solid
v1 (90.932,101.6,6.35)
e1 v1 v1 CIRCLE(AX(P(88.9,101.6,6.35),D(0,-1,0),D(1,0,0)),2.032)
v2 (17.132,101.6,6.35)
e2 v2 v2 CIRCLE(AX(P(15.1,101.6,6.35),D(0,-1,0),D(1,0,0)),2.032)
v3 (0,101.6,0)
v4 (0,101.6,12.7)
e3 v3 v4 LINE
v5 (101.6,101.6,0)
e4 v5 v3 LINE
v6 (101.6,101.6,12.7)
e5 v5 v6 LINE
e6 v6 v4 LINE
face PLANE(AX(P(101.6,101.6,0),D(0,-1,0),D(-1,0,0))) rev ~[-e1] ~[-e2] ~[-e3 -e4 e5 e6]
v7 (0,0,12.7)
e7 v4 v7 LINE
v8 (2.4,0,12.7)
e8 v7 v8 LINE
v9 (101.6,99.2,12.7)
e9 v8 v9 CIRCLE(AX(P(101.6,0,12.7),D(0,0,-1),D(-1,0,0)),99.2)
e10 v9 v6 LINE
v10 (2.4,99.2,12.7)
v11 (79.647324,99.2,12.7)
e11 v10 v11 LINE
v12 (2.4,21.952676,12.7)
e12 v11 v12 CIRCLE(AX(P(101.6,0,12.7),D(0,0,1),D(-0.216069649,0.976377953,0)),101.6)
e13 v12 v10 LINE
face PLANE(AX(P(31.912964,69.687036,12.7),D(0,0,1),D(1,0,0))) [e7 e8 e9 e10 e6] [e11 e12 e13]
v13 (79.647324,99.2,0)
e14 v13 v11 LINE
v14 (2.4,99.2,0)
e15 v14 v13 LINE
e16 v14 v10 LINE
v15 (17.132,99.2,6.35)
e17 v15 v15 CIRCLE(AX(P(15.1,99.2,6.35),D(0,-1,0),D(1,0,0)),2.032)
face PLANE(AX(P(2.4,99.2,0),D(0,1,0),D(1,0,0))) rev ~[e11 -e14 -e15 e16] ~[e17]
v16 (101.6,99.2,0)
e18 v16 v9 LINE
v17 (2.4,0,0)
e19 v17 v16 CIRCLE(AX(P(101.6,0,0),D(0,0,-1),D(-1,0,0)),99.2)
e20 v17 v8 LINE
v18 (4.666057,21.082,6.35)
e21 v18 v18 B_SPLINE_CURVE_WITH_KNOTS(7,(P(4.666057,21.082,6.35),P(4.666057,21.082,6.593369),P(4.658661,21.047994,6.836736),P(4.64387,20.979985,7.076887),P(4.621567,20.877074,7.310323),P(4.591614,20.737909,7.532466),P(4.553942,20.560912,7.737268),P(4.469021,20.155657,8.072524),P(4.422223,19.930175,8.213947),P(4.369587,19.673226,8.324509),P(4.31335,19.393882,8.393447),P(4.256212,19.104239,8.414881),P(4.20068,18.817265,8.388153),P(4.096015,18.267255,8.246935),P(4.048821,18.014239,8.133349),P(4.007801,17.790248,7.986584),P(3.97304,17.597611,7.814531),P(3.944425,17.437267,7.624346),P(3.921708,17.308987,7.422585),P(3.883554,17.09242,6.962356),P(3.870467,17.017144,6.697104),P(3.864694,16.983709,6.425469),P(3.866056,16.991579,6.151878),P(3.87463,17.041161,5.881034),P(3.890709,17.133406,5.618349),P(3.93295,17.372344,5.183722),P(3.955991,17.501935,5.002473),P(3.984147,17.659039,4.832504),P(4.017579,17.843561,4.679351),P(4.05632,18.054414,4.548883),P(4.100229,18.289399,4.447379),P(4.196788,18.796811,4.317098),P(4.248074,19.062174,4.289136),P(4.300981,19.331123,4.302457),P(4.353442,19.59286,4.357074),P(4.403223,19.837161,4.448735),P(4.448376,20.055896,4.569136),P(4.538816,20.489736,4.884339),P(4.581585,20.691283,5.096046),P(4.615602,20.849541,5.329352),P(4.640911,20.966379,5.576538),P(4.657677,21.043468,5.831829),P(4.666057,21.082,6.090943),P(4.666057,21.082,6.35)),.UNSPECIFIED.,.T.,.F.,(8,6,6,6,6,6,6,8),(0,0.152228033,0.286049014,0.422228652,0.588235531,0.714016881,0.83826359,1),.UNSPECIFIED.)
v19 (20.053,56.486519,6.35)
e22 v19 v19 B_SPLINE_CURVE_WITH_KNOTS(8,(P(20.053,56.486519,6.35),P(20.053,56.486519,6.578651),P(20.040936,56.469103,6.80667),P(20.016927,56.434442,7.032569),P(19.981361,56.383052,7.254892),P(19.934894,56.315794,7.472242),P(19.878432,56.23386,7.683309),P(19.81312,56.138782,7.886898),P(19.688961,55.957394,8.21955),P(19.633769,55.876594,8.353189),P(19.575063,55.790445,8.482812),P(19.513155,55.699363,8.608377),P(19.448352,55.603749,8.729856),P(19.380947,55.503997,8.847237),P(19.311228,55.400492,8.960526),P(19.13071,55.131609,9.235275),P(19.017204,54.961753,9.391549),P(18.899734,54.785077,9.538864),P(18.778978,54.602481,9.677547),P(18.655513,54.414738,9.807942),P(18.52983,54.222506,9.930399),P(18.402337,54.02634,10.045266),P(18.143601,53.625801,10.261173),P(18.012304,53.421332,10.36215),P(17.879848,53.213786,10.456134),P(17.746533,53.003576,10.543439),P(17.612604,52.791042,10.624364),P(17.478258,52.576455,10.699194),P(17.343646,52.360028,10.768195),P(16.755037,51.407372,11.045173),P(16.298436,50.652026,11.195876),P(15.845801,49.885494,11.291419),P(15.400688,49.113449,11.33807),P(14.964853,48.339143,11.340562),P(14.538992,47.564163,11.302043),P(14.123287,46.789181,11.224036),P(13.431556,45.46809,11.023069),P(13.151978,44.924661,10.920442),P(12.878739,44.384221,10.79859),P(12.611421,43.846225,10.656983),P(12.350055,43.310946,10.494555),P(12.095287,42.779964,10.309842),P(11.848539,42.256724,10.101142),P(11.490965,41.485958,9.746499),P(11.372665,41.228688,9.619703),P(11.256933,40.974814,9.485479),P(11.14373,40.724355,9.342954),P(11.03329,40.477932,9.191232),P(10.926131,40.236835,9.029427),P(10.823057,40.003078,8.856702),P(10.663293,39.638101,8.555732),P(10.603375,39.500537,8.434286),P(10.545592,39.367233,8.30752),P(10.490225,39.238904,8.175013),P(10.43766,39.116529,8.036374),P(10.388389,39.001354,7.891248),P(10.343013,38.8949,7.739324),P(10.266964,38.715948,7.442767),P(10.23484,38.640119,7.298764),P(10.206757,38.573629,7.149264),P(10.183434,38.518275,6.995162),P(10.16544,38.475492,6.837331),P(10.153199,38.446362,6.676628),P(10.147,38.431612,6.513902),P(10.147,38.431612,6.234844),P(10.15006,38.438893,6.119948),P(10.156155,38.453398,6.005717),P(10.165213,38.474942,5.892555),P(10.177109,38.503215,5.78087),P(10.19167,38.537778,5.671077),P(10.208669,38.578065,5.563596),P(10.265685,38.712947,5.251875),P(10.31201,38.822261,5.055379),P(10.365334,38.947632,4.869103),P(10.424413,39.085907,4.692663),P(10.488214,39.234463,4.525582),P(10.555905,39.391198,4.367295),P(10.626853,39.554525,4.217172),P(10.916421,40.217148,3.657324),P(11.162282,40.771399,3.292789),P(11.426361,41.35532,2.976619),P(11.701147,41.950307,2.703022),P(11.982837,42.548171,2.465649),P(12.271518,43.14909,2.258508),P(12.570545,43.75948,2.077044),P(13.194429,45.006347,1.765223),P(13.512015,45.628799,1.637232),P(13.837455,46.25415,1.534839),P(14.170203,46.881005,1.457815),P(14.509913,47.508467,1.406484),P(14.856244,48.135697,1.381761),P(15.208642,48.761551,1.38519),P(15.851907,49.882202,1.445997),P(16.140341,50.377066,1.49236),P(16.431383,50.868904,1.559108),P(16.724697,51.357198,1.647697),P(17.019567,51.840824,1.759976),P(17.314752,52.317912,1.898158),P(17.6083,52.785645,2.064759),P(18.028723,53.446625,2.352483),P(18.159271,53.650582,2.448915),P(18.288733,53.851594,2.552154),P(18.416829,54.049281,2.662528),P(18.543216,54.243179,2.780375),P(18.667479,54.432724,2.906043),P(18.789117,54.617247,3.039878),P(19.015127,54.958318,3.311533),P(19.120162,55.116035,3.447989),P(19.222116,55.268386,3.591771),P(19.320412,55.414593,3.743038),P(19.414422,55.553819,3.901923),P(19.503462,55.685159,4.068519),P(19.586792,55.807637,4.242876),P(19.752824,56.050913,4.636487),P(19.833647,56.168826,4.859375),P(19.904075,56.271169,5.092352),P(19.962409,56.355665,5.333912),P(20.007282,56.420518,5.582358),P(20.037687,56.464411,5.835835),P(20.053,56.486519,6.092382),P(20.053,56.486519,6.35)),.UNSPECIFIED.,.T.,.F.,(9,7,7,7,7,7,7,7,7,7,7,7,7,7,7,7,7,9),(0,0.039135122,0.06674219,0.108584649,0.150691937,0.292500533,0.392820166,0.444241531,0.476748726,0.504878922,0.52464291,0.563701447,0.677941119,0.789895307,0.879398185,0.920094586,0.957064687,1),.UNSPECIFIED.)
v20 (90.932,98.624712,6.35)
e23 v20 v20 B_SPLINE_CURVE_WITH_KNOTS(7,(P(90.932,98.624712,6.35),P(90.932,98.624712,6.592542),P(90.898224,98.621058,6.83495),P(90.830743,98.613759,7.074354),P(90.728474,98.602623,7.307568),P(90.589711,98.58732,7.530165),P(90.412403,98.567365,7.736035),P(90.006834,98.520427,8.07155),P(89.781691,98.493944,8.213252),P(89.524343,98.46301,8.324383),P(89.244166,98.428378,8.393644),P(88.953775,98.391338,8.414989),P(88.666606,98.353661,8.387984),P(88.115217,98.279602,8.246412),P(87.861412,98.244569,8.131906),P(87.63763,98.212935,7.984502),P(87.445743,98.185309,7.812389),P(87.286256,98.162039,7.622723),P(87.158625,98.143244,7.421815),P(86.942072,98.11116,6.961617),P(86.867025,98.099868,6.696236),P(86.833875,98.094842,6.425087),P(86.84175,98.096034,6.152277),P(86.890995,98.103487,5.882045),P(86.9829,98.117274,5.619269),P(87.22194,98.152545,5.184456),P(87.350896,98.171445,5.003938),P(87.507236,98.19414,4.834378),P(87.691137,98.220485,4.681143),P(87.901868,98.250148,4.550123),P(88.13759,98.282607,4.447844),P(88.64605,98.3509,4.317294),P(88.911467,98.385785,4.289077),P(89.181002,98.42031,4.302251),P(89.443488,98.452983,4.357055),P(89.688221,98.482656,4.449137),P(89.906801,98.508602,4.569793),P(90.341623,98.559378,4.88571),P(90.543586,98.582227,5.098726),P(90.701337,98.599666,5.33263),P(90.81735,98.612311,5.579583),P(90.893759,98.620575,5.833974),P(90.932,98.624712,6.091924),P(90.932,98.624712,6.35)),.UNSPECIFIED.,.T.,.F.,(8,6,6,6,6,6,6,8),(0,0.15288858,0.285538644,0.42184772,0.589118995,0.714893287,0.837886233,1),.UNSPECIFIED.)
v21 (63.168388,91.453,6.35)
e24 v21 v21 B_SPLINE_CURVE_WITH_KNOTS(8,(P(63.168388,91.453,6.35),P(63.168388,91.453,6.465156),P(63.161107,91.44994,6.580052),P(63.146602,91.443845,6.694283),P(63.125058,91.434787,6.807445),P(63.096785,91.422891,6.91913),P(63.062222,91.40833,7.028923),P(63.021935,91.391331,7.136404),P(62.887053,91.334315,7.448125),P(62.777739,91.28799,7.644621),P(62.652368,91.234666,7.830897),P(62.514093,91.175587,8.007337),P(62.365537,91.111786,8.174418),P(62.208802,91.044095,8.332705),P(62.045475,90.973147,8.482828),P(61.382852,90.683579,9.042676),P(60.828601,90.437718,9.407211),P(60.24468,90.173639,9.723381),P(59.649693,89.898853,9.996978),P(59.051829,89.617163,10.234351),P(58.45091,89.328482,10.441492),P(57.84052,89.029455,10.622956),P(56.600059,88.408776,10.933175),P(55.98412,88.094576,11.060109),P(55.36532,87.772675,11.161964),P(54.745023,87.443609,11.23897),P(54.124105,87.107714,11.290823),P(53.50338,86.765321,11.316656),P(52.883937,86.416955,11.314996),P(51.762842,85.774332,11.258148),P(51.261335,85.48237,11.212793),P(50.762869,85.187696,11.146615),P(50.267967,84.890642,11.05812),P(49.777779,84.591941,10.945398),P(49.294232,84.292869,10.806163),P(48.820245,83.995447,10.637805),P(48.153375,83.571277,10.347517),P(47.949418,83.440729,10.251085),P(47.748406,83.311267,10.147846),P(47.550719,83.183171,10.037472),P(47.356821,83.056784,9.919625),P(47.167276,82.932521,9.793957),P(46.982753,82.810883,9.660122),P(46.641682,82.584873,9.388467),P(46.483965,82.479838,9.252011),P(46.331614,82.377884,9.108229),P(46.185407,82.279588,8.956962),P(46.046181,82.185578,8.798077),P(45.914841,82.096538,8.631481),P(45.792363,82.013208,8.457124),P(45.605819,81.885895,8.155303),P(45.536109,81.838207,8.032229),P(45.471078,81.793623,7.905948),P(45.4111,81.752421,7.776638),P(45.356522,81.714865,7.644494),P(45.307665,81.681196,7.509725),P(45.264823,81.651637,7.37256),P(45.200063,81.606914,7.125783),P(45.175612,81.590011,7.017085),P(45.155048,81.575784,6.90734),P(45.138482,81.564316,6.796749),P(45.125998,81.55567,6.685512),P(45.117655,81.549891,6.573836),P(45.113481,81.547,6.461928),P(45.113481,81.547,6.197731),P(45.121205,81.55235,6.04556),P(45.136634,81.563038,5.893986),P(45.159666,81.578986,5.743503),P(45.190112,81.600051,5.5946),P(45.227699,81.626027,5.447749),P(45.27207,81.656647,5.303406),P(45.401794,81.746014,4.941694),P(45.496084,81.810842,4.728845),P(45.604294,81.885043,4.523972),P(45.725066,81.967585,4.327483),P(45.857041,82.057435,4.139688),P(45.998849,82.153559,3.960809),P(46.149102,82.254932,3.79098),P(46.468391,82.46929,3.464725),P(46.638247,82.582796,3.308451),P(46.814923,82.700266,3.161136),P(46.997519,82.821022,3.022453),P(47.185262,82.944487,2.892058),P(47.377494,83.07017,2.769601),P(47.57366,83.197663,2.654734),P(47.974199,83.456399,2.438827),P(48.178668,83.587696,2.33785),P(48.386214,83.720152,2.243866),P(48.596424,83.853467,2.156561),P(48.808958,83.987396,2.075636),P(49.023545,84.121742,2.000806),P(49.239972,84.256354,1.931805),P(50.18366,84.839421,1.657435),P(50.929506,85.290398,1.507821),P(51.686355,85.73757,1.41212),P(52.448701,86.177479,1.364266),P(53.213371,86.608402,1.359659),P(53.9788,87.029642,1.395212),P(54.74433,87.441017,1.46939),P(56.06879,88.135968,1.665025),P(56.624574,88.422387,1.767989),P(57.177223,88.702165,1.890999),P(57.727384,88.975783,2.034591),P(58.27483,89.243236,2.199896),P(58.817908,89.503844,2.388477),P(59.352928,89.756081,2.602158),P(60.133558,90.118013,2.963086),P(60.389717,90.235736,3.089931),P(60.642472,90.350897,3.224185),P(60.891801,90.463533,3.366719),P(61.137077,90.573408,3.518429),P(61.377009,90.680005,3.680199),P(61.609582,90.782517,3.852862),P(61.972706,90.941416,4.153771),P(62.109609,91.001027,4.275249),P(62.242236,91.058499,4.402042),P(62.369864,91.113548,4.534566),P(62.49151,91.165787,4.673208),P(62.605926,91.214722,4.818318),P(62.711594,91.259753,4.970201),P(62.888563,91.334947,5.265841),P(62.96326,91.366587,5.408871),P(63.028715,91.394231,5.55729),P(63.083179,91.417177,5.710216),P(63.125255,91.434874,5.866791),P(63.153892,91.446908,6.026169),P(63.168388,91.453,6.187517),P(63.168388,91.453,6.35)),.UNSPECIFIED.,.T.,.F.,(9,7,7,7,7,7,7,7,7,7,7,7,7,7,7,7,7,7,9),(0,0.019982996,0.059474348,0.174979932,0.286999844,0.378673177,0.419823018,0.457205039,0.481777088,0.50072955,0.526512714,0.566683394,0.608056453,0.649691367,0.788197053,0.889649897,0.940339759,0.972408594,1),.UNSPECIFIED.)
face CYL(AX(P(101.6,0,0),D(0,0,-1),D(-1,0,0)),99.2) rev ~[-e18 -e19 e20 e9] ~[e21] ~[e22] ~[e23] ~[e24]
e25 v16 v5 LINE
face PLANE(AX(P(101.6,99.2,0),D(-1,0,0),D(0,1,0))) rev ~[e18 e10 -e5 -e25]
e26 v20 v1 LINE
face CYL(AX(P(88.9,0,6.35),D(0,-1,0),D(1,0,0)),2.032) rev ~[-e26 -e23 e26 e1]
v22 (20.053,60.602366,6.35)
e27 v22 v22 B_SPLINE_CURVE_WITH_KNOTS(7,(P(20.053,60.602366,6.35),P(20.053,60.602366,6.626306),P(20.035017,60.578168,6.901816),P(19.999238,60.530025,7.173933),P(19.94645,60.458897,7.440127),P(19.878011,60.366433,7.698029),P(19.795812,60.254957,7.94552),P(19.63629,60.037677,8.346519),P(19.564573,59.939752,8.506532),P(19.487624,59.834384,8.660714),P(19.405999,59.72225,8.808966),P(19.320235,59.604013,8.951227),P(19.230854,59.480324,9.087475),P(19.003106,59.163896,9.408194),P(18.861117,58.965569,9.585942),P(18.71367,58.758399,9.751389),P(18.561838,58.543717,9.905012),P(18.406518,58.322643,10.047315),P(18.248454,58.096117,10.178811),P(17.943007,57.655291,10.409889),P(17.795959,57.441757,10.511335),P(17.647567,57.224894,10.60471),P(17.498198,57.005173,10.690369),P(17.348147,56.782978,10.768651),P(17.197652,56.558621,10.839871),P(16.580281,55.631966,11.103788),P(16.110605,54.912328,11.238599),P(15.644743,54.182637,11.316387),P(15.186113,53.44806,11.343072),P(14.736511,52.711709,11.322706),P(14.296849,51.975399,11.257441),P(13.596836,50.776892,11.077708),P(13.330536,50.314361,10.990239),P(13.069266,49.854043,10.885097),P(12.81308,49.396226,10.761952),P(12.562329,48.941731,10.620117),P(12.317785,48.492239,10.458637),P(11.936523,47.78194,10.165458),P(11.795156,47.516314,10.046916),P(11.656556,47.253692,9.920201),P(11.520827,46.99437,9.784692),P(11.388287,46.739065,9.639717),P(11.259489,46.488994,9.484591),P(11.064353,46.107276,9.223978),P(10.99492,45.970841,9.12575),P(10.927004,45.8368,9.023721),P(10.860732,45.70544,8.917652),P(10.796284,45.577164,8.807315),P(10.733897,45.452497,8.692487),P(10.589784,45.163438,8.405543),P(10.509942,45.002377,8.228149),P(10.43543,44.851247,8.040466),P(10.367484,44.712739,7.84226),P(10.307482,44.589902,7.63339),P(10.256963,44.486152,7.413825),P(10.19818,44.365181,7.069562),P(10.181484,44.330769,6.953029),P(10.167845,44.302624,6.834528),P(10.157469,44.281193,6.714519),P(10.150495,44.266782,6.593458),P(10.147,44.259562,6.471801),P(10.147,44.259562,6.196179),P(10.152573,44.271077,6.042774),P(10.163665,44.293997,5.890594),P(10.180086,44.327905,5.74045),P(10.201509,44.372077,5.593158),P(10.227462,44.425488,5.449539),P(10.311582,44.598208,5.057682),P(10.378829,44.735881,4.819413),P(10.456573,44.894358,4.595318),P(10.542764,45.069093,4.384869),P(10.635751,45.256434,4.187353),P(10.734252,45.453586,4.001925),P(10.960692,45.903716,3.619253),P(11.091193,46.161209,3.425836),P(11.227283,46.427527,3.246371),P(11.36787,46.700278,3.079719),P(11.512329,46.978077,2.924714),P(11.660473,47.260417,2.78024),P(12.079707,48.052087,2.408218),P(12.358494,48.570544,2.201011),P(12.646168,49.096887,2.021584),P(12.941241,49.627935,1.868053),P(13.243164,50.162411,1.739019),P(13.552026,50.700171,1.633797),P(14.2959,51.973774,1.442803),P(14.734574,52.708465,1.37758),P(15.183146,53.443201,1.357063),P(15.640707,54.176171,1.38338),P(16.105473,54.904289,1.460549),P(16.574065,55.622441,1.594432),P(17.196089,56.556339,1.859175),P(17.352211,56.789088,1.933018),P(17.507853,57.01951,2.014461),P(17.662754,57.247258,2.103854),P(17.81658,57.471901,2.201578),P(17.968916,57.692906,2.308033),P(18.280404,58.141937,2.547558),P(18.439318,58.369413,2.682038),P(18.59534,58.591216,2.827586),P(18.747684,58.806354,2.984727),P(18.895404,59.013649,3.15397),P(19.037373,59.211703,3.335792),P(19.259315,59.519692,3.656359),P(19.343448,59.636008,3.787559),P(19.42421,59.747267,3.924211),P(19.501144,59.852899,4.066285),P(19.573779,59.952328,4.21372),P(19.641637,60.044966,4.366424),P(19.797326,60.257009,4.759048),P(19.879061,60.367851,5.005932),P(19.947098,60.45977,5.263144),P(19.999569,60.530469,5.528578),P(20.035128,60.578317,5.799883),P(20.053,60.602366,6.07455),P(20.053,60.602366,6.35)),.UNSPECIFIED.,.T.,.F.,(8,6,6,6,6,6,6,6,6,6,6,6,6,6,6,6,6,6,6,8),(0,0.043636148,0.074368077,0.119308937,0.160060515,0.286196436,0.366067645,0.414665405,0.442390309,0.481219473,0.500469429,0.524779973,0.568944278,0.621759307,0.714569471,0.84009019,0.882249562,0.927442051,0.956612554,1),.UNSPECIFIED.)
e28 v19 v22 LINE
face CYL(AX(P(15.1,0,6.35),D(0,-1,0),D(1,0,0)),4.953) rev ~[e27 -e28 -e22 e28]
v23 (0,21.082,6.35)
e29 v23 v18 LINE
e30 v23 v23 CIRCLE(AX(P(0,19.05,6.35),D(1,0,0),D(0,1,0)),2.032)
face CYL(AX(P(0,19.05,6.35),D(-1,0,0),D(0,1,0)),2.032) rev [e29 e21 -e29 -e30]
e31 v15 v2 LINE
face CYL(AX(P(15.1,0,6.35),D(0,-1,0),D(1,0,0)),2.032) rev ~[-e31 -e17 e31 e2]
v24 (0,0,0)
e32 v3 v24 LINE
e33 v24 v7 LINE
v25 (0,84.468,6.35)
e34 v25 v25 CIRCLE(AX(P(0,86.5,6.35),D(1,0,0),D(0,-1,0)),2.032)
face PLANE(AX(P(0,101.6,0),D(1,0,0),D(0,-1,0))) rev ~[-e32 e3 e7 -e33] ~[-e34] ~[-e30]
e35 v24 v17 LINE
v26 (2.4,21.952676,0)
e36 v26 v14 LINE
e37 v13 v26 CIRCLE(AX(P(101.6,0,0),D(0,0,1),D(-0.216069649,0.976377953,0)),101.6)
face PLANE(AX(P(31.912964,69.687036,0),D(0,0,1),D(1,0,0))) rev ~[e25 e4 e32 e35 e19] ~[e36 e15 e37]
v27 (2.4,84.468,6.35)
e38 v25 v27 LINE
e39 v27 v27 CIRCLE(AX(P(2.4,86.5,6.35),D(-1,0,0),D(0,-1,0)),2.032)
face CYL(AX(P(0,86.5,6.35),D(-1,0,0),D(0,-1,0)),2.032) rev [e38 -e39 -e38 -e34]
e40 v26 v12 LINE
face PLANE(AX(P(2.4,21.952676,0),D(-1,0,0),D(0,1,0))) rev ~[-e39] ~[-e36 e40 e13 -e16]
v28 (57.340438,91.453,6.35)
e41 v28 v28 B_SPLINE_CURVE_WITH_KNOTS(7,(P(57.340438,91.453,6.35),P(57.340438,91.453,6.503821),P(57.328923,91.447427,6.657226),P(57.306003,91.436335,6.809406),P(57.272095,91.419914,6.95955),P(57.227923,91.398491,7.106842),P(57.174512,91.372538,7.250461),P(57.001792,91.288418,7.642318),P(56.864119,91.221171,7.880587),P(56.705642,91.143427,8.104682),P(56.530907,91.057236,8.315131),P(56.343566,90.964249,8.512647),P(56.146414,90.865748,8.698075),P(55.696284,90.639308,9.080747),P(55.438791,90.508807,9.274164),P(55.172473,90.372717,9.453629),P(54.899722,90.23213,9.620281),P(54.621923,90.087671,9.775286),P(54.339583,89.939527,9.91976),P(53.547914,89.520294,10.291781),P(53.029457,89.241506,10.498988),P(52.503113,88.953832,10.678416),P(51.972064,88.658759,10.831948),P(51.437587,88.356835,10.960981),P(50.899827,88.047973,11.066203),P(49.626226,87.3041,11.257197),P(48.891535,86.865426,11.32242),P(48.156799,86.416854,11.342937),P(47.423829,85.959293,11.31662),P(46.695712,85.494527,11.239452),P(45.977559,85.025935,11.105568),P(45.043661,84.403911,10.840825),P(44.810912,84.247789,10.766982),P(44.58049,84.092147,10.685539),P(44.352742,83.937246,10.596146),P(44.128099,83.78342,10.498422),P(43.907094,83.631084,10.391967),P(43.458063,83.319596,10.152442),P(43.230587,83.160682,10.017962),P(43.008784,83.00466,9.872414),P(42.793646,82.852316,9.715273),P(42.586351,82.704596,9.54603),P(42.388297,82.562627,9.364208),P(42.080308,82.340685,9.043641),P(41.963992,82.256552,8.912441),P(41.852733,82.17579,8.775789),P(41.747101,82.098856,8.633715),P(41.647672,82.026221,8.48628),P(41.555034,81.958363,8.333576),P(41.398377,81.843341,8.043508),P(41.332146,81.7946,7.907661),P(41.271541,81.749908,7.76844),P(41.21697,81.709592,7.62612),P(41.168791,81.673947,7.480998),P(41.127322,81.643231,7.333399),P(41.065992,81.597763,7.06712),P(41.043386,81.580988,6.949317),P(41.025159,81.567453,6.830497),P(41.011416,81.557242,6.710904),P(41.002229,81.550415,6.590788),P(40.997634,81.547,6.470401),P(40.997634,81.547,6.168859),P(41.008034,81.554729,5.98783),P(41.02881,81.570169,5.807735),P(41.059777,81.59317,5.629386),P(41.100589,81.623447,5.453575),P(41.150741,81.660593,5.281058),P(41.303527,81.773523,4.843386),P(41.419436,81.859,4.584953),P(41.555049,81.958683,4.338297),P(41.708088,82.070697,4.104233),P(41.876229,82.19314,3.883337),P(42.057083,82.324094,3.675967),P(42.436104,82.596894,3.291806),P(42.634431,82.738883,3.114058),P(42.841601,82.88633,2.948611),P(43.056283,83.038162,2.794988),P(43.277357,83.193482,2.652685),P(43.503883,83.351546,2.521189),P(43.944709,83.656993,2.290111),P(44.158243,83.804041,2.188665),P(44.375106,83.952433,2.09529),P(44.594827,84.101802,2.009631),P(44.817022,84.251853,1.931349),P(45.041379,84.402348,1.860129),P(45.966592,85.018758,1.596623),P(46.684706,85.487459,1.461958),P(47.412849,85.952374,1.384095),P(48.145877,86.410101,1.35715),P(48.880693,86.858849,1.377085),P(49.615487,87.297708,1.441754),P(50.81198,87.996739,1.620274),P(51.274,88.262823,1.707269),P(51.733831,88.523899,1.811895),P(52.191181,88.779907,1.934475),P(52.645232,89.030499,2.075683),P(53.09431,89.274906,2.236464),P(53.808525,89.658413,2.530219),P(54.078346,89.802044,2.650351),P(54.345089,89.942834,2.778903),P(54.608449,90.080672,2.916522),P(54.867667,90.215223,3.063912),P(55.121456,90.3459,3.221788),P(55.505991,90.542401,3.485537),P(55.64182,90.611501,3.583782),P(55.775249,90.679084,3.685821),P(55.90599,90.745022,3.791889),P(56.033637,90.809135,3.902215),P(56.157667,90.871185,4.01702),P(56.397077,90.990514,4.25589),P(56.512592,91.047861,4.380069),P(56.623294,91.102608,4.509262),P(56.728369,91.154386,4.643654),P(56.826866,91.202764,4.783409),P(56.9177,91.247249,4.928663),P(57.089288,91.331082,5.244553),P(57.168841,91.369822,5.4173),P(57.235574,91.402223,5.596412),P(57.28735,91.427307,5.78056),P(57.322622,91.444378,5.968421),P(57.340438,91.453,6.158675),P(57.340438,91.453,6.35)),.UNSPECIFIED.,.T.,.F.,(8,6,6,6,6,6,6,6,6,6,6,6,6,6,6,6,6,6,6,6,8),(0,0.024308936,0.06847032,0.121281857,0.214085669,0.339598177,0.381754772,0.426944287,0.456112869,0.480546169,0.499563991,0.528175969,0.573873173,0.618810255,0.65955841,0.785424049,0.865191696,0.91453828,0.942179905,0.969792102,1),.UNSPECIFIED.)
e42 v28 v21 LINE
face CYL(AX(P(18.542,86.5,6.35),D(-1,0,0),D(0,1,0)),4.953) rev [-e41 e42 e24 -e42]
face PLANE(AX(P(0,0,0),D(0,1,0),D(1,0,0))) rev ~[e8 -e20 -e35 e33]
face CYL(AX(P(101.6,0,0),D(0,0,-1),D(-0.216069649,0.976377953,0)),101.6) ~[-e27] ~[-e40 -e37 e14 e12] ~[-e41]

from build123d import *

# Parameters (mm, degrees)
F1_DEPTH = 12.7
F2_R     = 2.032
F3_DEPTH = 101.601
F4_R     = 2.032
F5_DEPTH = 101.601
F6_R     = 4.953
F7_DEPTH = 63.246
F9_START = 18.542
F8_R     = 4.953
F9_DEPTH = 49.53


with BuildPart() as f1:
    # F0 (on Top) → F1 (new body)
    with BuildSketch(Plane.XY):
        with BuildLine():
            Line((101.6, 99.2), (101.6, 101.6))
            Line((101.6, 101.6), (0, 101.6))
            Line((0, 101.6), (0, 0))
            Line((0, 0), (2.4, 0))
            ThreePointArc((2.4, 0), (31.4550073063, 70.1449926937), (101.6, 99.2))
        make_face()
        with BuildLine():
            Line((2.4, 99.2), (79.6473236256, 99.2))
            ThreePointArc((79.6473236256, 99.2), (29.7579510314, 71.8420489686), (2.4, 21.9526763744))
            Line((2.4, 21.9526763744), (2.4, 99.2))
        make_face(mode=Mode.SUBTRACT)
    extrude(amount=F1_DEPTH)

    # F2 (on Right) → F3 (cut, through all)
    with BuildSketch(Plane.YZ):
        with Locations((19.05, 6.35)):
            Circle(F2_R)
        with BuildLine():
            ThreePointArc((88.532, 6.35), (86.5, 8.382), (84.468, 6.35))
            ThreePointArc((84.468, 6.35), (86.5, 4.318), (88.532, 6.35))
        make_face()
    extrude(amount=F3_DEPTH, mode=Mode.SUBTRACT)

    # F4 (on Front) → F5 (cut, through all)
    with BuildSketch(Plane.XZ):
        with Locations((15.1, 6.35)):
            Circle(F4_R)
        with Locations((88.9, 6.35)):
            Circle(F4_R)
    extrude(amount=-F5_DEPTH, mode=Mode.SUBTRACT)

    # F6 (on Front) → F7 (cut)
    with BuildSketch(Plane.XZ):
        with Locations((15.1, 6.35)):
            Circle(F6_R)
    extrude(amount=-F7_DEPTH, mode=Mode.SUBTRACT)

    # F8 (on Right) → F9 (cut)
    with BuildSketch(Plane.YZ.offset(F9_START)):
        with Locations((86.5, 6.35)):
            Circle(F8_R)
    extrude(amount=F9_DEPTH, mode=Mode.SUBTRACT)


solid = f1.part
